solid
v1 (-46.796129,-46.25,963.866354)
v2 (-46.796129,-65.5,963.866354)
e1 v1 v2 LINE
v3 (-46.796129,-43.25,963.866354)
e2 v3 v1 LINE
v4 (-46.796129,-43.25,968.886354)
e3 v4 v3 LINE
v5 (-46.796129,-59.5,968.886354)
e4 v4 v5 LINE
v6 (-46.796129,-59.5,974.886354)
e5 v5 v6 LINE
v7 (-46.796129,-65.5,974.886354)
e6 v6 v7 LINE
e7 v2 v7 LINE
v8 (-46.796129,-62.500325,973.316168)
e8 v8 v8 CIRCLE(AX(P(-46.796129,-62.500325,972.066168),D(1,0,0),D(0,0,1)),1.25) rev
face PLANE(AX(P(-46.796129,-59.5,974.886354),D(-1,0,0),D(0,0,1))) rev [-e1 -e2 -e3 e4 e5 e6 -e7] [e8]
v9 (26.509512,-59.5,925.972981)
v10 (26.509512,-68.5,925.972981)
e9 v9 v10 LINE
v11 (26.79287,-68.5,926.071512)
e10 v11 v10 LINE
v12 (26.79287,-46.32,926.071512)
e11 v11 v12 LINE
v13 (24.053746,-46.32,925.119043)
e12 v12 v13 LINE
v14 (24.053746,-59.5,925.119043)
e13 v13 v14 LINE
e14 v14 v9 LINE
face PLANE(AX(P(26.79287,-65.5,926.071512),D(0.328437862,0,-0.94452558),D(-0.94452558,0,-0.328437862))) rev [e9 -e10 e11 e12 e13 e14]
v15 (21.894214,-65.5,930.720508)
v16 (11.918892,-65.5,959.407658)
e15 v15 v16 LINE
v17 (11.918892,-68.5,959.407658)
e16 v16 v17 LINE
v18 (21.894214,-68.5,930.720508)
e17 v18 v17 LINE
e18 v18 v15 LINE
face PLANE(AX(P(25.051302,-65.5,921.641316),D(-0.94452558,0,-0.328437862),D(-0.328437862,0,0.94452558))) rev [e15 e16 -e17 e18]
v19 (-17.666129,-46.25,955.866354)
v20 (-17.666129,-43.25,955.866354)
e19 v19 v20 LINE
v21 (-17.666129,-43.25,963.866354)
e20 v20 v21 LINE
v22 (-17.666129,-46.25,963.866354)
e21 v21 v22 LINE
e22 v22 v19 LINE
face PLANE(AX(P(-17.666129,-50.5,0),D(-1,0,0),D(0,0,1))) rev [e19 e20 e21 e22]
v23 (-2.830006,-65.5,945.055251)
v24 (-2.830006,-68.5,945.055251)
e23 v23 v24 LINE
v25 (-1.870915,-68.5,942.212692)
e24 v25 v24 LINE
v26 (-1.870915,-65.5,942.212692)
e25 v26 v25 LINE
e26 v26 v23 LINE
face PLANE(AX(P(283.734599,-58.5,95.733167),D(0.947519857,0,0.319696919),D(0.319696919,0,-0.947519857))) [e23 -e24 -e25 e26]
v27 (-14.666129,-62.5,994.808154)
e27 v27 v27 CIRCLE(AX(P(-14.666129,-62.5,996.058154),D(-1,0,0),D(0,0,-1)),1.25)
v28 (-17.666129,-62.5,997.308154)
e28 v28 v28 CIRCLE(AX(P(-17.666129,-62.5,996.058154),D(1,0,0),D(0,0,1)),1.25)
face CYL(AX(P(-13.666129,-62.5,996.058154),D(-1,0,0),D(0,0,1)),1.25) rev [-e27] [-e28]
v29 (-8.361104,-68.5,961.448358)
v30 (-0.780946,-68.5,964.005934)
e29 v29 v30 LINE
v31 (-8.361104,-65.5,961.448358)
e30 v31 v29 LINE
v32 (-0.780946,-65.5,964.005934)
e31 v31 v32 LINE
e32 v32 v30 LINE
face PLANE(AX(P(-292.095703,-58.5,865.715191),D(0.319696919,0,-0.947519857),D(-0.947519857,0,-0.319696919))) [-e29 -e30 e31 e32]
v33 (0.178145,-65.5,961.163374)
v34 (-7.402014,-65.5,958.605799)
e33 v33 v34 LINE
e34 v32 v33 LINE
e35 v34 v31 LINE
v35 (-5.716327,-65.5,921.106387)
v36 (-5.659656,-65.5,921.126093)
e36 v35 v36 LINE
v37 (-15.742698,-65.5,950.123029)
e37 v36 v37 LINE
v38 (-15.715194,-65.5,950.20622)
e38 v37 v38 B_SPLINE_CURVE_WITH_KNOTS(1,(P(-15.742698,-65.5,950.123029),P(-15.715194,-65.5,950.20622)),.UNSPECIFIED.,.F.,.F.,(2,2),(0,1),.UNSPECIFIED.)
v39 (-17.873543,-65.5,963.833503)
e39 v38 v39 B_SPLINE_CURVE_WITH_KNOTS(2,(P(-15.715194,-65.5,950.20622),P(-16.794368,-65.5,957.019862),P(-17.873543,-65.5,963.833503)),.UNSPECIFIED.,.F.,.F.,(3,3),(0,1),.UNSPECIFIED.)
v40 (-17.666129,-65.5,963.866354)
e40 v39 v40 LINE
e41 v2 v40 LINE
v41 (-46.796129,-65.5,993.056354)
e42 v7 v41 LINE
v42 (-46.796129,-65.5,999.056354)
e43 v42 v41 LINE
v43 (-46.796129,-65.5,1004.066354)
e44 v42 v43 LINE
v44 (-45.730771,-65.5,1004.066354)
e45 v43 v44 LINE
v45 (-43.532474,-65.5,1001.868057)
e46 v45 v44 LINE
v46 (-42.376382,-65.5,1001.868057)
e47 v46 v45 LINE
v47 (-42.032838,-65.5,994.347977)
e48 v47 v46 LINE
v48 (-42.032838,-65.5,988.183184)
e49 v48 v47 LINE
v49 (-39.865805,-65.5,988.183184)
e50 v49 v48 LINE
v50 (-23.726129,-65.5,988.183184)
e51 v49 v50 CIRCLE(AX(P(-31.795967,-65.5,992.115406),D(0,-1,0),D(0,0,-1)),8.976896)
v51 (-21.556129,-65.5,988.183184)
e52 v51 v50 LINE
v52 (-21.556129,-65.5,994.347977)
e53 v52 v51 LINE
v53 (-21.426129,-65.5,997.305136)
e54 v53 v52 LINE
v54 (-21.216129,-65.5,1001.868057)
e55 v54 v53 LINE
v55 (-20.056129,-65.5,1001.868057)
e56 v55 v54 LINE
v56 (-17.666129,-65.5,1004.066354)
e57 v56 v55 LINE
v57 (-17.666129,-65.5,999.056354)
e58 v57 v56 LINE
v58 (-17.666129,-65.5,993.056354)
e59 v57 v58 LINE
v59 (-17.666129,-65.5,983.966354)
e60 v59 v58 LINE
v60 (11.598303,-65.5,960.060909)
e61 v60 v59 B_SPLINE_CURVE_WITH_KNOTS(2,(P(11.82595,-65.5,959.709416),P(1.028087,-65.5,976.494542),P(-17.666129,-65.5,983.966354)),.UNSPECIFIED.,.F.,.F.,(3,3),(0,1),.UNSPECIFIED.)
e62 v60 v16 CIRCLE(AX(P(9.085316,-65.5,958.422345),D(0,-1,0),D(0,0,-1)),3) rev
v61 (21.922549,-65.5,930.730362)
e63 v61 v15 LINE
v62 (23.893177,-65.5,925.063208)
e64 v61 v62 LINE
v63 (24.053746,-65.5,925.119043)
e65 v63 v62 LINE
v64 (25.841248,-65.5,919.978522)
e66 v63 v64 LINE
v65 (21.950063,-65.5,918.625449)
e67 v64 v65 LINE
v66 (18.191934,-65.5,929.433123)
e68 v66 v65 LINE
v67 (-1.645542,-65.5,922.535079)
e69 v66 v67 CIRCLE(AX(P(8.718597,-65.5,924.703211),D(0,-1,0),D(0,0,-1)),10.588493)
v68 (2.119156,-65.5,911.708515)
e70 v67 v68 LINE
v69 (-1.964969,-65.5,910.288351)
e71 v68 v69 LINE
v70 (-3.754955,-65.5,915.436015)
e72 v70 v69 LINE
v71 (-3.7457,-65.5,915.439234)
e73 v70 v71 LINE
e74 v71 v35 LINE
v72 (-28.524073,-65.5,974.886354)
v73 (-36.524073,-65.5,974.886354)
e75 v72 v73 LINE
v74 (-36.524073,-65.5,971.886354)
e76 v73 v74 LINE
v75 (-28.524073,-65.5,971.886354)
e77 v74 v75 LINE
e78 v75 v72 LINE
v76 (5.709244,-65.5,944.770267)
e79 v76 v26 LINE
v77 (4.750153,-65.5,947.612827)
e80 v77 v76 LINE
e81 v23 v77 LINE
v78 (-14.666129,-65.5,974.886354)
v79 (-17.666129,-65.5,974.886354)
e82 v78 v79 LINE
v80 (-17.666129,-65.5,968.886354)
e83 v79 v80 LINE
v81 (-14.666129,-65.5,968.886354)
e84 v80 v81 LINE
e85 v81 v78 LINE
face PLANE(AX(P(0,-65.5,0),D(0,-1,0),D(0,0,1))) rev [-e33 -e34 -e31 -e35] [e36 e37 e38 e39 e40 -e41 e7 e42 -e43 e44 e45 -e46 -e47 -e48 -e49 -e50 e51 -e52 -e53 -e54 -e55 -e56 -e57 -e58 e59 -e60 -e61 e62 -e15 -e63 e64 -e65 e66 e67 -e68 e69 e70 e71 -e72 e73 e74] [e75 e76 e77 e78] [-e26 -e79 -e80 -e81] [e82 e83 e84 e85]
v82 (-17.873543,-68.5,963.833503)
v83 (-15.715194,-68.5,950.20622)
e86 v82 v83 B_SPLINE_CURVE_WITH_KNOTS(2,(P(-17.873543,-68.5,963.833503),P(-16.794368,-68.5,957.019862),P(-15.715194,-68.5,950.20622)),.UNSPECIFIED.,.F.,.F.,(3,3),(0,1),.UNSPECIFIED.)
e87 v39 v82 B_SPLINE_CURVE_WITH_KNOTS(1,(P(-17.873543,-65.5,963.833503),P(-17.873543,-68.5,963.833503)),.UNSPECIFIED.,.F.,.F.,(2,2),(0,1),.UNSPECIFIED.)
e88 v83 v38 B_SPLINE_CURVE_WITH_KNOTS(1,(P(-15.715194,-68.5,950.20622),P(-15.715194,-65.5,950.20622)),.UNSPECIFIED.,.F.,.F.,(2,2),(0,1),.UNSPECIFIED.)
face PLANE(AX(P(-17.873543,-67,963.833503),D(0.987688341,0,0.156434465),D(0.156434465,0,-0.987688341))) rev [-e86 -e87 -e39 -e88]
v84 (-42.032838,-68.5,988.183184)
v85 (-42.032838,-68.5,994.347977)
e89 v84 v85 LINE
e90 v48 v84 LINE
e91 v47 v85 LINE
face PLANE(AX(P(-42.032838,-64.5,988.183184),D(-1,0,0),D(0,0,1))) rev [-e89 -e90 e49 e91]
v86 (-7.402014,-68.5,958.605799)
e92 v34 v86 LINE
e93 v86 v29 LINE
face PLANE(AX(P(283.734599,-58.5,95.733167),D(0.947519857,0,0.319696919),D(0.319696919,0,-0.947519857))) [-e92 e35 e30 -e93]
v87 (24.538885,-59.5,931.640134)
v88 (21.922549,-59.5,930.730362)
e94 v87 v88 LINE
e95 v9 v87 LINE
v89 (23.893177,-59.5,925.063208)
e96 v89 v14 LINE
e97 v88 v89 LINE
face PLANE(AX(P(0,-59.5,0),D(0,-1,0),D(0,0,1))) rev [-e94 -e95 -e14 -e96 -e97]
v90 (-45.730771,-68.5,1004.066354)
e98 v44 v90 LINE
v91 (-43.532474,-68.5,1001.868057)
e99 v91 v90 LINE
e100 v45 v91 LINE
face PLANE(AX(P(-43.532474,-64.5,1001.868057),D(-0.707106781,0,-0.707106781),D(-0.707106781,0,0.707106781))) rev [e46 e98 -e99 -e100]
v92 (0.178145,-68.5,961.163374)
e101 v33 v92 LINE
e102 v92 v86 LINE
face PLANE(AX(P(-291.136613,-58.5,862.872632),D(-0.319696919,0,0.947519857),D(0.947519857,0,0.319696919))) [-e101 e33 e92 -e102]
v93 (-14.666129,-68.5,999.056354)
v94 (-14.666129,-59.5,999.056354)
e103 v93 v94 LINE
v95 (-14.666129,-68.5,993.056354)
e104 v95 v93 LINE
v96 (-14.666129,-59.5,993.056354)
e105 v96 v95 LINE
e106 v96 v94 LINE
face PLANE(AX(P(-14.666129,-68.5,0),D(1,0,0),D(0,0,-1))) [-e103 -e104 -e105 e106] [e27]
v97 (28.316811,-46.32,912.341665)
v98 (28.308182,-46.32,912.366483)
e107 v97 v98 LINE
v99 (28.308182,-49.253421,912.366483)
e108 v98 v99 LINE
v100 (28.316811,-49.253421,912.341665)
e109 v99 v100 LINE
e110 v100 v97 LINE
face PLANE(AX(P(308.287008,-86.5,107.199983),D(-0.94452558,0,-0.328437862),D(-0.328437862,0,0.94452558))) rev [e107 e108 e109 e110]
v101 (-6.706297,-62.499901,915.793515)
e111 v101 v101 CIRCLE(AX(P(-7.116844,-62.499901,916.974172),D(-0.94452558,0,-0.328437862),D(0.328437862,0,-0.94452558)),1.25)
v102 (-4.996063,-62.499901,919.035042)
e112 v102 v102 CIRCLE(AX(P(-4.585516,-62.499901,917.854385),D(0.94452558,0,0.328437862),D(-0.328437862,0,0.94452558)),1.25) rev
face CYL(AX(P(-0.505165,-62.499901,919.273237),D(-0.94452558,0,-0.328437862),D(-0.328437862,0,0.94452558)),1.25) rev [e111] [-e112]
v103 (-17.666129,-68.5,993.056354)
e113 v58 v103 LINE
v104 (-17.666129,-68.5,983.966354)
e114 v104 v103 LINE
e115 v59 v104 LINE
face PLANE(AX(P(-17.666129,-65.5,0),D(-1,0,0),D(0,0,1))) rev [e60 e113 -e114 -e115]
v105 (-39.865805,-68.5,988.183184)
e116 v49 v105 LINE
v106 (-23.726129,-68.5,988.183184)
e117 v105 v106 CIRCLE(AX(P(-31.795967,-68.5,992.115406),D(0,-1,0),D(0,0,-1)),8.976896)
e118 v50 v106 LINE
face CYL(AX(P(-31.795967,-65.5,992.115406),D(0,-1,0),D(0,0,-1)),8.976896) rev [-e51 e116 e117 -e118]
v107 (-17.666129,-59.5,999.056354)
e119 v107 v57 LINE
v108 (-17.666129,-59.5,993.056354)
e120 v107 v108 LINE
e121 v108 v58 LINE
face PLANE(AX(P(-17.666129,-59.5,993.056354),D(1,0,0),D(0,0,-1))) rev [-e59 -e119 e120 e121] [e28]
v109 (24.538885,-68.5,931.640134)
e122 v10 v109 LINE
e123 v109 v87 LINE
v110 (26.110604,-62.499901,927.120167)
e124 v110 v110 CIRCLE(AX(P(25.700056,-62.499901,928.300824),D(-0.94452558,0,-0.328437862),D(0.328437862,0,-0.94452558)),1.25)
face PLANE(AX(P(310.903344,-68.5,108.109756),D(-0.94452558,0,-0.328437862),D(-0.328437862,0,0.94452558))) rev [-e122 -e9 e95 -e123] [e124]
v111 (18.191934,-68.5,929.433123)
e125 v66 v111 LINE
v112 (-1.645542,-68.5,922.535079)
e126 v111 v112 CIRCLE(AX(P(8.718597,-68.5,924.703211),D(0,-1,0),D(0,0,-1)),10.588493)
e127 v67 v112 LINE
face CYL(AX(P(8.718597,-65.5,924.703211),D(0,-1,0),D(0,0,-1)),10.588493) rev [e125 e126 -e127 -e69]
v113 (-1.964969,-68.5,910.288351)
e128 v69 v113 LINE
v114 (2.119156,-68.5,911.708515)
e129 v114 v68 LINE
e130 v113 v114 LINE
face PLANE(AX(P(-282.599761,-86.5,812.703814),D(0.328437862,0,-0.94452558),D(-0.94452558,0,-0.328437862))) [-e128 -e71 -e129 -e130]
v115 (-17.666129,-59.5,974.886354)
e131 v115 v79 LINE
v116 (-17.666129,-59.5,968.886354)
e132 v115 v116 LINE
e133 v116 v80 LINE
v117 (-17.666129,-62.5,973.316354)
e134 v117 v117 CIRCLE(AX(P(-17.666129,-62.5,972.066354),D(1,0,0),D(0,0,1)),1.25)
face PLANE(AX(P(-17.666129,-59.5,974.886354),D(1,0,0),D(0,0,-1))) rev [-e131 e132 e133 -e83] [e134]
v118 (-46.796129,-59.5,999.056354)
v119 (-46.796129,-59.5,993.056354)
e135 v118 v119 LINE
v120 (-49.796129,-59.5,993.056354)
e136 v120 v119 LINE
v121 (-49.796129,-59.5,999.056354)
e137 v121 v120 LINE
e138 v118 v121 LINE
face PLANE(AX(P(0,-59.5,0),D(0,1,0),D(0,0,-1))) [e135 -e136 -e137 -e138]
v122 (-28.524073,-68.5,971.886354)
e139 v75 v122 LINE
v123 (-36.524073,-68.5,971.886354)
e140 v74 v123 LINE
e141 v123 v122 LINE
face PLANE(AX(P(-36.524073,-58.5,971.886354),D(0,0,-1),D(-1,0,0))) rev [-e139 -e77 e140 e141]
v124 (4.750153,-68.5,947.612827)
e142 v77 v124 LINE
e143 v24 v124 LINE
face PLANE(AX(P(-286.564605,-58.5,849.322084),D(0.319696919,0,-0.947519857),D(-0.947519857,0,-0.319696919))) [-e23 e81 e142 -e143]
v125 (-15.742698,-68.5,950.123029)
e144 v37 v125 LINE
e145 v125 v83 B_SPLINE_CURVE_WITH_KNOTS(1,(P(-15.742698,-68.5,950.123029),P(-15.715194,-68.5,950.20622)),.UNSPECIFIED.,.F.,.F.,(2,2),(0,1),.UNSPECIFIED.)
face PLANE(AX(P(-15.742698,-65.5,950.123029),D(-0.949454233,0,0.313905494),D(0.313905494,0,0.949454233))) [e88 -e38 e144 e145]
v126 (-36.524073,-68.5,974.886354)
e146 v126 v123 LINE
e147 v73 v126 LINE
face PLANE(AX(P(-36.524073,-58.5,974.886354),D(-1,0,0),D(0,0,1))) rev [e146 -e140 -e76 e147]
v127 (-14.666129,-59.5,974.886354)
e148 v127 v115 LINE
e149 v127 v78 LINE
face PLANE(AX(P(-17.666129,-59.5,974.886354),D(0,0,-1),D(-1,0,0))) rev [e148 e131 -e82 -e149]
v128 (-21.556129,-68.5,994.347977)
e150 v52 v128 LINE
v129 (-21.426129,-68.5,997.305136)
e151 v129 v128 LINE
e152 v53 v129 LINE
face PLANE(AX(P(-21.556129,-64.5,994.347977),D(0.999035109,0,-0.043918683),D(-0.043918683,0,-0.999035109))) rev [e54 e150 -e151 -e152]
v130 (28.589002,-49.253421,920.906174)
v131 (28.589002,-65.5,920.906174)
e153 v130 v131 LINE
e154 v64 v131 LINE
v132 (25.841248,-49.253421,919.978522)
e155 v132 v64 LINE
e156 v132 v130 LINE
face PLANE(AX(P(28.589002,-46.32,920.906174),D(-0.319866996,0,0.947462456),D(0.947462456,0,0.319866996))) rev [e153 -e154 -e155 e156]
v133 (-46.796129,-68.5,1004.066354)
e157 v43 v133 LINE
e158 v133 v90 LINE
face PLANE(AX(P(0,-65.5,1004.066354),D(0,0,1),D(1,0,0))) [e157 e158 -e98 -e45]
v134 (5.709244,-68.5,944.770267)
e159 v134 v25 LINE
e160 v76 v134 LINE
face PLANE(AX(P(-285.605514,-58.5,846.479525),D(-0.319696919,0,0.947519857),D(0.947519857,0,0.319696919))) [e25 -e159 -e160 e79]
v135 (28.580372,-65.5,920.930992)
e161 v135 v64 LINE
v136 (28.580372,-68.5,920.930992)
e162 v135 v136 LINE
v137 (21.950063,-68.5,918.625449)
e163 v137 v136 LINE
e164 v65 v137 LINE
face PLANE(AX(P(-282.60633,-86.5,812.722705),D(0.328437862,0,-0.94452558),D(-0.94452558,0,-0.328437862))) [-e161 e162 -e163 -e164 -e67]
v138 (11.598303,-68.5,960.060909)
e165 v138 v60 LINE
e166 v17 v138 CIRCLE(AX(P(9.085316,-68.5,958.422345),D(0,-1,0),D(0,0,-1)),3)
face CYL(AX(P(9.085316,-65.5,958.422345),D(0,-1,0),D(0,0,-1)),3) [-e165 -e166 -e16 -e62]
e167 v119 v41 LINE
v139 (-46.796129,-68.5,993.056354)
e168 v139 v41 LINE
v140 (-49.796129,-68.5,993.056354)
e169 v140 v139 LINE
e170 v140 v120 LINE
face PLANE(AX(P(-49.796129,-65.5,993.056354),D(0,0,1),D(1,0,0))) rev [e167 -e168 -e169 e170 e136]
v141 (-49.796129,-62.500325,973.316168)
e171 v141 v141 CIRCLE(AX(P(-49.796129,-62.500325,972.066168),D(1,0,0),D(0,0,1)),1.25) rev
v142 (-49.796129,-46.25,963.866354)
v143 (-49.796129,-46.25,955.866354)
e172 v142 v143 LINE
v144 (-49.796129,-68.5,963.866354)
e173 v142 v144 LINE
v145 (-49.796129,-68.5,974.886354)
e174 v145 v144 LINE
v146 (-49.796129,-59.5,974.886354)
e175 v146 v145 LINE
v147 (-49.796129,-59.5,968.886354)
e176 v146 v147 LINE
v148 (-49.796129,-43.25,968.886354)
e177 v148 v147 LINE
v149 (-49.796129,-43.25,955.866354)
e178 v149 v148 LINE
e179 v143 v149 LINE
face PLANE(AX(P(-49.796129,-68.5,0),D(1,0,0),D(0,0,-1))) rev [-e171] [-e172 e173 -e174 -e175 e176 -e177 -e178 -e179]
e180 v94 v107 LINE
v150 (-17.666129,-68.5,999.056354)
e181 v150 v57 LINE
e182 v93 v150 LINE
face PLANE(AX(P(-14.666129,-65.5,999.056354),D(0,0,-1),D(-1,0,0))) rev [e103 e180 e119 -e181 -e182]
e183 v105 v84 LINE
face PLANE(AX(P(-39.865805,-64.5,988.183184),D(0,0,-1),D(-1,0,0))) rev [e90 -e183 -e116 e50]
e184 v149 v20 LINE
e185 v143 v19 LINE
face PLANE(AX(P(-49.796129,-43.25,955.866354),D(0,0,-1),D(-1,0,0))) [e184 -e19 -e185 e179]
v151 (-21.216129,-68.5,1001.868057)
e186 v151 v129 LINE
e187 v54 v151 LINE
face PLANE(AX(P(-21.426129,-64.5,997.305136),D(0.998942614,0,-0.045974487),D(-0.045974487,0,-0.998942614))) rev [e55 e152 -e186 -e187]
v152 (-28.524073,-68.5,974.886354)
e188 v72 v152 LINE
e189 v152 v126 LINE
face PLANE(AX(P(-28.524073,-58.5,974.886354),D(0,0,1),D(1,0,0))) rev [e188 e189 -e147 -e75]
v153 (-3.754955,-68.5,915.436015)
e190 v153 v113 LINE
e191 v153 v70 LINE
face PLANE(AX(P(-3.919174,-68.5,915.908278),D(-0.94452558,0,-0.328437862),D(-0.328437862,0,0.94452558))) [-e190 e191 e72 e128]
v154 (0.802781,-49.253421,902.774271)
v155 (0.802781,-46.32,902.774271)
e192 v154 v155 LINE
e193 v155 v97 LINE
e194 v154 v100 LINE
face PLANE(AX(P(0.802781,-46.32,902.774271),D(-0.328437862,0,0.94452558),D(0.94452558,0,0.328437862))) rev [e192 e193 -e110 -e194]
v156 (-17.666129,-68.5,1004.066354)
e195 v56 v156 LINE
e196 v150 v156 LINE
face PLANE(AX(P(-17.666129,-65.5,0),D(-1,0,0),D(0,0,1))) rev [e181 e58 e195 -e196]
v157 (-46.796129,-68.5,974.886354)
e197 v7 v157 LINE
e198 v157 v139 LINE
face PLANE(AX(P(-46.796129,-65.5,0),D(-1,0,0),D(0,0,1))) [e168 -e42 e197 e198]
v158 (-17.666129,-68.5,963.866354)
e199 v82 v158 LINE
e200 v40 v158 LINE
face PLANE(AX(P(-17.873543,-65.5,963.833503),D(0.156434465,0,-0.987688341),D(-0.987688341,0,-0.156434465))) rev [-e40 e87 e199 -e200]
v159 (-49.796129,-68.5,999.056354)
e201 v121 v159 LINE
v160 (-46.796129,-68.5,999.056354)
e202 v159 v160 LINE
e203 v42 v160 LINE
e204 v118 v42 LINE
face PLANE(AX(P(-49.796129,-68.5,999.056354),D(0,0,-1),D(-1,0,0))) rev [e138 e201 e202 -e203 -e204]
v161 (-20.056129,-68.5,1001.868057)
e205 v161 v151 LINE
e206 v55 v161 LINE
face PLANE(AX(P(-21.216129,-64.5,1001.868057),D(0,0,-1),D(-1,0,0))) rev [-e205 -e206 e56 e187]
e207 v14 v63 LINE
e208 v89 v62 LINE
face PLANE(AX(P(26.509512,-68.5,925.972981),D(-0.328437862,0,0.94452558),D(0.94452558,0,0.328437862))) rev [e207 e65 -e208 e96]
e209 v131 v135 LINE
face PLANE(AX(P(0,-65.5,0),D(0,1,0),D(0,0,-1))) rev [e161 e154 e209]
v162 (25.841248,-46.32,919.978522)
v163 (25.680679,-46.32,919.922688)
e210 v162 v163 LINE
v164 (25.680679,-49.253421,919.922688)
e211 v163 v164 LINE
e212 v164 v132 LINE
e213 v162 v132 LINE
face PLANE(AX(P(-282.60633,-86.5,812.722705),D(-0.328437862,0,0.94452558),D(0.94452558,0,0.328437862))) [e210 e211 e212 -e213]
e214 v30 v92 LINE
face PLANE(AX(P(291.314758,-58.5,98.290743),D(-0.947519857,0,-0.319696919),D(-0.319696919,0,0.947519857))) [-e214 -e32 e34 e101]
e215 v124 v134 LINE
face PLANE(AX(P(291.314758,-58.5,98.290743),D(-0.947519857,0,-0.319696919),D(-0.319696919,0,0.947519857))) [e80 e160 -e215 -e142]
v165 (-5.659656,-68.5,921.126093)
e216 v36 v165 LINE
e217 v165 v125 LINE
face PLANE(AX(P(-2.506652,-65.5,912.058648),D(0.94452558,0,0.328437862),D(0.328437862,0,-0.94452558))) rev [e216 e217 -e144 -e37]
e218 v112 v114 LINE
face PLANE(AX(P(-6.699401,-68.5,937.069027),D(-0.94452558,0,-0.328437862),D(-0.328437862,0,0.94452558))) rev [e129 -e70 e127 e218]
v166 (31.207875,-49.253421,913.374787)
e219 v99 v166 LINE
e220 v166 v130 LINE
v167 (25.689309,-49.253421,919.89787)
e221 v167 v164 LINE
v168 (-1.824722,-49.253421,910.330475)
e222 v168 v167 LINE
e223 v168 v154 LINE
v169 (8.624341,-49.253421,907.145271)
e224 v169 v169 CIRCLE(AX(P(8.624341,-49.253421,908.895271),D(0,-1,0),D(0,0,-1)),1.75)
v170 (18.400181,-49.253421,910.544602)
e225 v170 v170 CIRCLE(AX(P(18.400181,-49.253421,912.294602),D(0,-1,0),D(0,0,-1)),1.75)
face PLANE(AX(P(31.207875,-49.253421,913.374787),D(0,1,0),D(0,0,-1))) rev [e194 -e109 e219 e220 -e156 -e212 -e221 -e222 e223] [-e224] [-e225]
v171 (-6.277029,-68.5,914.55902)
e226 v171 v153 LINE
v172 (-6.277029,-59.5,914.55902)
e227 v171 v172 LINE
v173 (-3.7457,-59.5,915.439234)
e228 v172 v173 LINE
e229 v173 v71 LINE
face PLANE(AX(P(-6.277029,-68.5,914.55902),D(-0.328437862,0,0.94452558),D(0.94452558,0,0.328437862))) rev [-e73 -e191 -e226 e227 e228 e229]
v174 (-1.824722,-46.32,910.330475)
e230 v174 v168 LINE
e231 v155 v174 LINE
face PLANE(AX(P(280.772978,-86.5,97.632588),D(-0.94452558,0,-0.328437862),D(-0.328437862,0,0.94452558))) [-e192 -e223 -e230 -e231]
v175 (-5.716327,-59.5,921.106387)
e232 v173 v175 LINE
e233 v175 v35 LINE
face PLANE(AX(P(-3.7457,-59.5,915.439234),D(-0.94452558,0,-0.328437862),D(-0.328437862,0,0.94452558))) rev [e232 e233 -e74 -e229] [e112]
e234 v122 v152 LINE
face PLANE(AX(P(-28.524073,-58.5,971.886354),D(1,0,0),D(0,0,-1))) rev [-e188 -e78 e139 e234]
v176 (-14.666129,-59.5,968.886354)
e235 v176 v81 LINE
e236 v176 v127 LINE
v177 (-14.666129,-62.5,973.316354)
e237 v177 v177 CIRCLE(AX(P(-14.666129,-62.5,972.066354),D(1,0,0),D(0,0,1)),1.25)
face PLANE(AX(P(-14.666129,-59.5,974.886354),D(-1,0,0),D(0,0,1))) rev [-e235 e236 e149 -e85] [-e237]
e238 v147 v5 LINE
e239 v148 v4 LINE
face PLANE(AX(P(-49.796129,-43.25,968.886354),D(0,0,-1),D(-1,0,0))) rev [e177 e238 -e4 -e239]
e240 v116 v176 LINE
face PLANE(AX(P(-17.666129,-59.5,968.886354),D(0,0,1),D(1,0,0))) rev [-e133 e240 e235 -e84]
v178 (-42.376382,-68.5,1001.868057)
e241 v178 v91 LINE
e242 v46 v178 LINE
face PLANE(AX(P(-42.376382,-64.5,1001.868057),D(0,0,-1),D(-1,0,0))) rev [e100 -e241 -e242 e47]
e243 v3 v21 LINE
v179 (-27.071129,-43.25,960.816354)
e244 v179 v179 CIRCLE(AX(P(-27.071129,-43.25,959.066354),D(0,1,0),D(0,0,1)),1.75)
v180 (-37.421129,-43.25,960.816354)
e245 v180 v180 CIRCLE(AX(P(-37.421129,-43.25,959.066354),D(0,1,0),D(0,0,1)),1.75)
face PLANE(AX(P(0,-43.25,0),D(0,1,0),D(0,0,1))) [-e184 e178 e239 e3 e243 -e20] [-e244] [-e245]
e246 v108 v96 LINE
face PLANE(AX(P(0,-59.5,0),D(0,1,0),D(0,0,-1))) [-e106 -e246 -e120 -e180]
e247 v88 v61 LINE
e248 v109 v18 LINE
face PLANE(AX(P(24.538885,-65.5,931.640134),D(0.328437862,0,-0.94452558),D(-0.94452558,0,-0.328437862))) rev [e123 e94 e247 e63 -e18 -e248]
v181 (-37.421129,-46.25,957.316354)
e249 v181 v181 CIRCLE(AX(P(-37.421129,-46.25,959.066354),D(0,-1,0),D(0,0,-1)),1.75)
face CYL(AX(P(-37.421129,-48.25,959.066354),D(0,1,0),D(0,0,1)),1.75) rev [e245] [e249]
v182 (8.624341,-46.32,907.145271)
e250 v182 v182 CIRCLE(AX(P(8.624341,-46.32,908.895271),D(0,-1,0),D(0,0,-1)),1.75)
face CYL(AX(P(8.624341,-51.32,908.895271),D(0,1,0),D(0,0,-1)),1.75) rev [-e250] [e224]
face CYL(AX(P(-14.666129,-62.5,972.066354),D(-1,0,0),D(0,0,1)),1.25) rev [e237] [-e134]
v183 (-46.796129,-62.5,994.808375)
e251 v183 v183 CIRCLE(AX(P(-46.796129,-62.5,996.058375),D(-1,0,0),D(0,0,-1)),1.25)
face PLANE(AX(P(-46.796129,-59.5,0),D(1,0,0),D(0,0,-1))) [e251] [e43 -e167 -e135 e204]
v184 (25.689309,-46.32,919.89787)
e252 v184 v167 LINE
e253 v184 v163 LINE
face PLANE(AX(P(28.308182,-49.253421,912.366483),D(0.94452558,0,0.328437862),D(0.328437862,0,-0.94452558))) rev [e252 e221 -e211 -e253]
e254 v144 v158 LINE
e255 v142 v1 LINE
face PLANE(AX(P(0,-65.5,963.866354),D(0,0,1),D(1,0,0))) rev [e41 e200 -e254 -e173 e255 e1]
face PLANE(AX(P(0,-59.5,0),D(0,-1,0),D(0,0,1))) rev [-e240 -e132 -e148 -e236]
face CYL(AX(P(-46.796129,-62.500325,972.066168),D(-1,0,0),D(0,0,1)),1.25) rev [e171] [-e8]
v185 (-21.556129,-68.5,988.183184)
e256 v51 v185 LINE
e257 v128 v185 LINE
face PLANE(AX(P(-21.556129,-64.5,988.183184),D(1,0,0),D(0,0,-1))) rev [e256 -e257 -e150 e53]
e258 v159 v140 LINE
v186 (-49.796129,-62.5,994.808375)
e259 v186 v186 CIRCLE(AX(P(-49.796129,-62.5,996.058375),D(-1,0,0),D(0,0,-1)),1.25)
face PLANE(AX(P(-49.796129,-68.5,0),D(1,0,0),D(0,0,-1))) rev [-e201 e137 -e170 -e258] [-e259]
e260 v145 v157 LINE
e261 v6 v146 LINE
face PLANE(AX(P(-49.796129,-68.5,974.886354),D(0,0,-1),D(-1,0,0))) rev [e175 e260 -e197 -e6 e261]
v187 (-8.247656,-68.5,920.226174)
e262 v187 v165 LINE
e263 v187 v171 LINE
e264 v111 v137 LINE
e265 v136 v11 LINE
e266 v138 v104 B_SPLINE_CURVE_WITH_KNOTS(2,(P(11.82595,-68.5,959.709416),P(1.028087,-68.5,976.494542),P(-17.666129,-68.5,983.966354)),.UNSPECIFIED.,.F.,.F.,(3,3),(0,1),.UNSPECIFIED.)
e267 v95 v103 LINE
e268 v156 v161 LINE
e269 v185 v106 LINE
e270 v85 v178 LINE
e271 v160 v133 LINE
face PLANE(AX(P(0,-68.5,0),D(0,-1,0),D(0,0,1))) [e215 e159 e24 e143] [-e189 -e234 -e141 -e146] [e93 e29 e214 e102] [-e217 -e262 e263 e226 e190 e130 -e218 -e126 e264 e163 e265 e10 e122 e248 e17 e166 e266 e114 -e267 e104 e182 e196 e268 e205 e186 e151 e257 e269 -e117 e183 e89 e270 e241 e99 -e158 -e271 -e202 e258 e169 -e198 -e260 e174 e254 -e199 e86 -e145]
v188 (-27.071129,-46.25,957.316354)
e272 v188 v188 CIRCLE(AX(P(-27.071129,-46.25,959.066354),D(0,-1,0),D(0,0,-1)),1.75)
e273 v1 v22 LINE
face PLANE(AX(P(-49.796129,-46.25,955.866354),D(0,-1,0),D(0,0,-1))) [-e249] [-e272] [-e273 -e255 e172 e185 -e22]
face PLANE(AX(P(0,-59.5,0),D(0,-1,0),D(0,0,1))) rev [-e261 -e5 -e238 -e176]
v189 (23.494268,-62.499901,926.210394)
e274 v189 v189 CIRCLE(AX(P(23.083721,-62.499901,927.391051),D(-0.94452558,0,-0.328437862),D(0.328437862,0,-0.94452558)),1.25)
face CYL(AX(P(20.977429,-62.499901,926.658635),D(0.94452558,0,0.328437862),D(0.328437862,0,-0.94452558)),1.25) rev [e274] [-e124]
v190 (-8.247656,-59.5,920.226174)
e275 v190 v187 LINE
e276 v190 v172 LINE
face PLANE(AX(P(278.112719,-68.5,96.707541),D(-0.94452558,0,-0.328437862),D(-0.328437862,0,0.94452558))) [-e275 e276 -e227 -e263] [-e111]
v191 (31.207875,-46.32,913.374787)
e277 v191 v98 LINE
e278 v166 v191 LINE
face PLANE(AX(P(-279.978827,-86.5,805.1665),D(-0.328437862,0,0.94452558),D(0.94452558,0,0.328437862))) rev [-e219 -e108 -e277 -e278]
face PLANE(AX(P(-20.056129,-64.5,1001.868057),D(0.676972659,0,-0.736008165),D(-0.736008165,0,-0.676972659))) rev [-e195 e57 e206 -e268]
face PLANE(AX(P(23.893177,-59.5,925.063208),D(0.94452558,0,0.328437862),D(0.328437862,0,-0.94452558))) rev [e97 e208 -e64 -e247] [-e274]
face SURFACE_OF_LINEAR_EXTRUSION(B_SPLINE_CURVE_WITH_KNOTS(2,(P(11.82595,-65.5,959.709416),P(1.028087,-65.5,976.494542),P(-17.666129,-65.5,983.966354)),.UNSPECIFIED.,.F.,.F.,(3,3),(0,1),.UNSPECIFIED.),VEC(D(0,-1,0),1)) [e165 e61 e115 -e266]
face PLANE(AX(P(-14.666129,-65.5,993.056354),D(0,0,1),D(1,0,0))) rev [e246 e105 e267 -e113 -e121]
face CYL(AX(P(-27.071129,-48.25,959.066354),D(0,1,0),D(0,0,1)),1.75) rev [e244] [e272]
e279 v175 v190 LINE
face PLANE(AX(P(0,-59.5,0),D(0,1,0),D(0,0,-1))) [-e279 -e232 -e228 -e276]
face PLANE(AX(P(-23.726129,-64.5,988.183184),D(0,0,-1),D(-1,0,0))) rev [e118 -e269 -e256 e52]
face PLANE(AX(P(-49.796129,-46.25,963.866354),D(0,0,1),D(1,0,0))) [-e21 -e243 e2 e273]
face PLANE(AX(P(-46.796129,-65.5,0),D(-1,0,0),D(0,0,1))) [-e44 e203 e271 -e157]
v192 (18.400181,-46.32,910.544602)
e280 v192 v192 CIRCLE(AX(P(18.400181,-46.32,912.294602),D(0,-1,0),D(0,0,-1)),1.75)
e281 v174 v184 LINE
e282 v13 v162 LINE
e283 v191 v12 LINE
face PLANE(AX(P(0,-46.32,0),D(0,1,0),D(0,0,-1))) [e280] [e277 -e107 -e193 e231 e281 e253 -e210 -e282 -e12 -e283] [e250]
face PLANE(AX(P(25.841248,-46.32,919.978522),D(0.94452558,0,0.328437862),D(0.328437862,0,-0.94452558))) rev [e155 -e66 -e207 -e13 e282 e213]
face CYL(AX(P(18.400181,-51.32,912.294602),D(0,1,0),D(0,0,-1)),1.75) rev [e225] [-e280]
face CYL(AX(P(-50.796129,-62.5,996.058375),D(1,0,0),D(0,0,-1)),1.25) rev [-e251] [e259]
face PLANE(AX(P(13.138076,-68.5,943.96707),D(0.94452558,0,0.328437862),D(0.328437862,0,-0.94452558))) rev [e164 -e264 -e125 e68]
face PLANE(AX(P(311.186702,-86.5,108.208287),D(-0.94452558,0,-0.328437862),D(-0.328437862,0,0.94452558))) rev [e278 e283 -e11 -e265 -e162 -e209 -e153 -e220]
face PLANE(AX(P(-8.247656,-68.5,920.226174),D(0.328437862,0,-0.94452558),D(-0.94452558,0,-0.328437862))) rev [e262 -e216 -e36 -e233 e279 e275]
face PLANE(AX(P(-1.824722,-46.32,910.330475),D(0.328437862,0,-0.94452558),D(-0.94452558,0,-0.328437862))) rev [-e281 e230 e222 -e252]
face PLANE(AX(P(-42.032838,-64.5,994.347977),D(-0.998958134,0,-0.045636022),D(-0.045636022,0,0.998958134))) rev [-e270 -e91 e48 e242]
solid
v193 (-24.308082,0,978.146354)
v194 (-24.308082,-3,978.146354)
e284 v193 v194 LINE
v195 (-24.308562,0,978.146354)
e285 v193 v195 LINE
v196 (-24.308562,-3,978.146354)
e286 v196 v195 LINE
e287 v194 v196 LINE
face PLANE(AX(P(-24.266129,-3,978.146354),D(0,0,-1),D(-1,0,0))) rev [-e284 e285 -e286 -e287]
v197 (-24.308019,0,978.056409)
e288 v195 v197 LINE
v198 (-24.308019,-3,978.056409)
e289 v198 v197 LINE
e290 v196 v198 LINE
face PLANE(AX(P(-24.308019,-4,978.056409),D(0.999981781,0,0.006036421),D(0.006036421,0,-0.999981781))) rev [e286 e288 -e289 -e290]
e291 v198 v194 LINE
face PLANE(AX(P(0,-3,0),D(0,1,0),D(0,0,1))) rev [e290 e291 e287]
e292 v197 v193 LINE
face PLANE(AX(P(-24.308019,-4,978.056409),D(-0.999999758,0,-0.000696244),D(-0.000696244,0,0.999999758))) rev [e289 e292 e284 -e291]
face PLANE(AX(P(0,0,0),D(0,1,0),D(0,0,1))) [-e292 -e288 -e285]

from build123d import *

# Parameters (mm, degrees)
SKETCH1_W                 = 29.13
SKETCH1_H                 = 40.2
BOSS_EXTRUDE1_DEPTH       = 3
SKETCH3_W                 = 6
SKETCH3_H                 = 3
BOSS_EXTRUDE2_DEPTH       = 3
SKETCH4_W                 = 3
SKETCH4_H                 = 6
BOSS_EXTRUDE3_DEPTH       = 6
SKETCH6_W                 = 6
SKETCH6_H                 = 3
BOSS_EXTRUDE4_DEPTH       = 2
SKETCH7_W                 = 3.000000005
SKETCH7_H                 = 6
BOSS_EXTRUDE6_DEPTH       = 6
SKETCH9_R                 = 1.25
CUT_EXTRUDE1_DEPTH        = 3
SKETCH8_R                 = 1.250000001
CUT_EXTRUDE2_DEPTH        = 3
SKETCH11_W                = 6
SKETCH11_H                = 3
BOSS_EXTRUDE7_DEPTH       = 3
SKETCH19_W                = 3
SKETCH19_H                = 6
BOSS_EXTRUDE11_DEPTH      = 6
SKETCH21_W                = 6
SKETCH21_H                = 3
BOSS_EXTRUDE12_DEPTH      = 3
SKETCH22_W                = 3
SKETCH22_H                = 6
BOSS_EXTRUDE13_DEPTH      = 6
SKETCH24_R                = 1.25
CUT_EXTRUDE5_DEPTH        = 4
SKETCH23_R                = 1.25
CUT_EXTRUDE6_DEPTH        = 4
CUT_EXTRUDE8_DEPTH        = 4
CUT_EXTRUDE11_DEPTH       = 4
SKETCH30_W                = 25.92
SKETCH30_H                = 3
CUT_EXTRUDE12_DEPTH       = 15
SKETCH33_W                = 29.17650364
SKETCH33_H                = 3
BOSS_EXTRUDE14_DEPTH      = 40.3
SKETCH34_W                = 21.00258235
SKETCH34_H                = 3
CUT_EXTRUDE15_DEPTH       = 25
CUT_EXTRUDE16_DEPTH       = 5
SKETCH37_W                = 4.5
SKETCH37_H                = 3
SKETCH37_W_2              = 1.5
BOSS_EXTRUDE15_DEPTH      = 3
BOSS_EXTRUDE16_DEPTH      = 6
SKETCH41_W                = 6
SKETCH41_H                = 3
BOSS_EXTRUDE17_DEPTH      = 2.8
BOSS_EXTRUDE18_DEPTH      = 6
SKETCH44_R                = 1.25
CUT_EXTRUDE19_DEPTH       = 7
SKETCH45_R                = 1.249999996
CUT_EXTRUDE20_DEPTH       = 5
SKETCH46_W                = 5.02
SKETCH46_H                = 3
BOSS_EXTRUDE19_DEPTH      = 3
SKETCH48_W                = 3
SKETCH48_H                = 5.02
BOSS_EXTRUDE20_DEPTH      = 22.25
BOSS_EXTRUDE22_DEPTH      = 29.13
BOSS_EXTRUDE22_DEPTH_BACK = 3
SKETCH50_W                = 8
SKETCH50_H                = 3
SKETCH51_R                = 1.75
CUT_EXTRUDE21_DEPTH       = 5
SKETCH56_W                = 3.994197227
SKETCH56_H                = 3.994197227
CUT_EXTRUDE26_DEPTH       = 0.1
FILLET4_START             = -19
FILLET4_DEPTH             = 5
BOSS_EXTRUDE28_DEPTH      = 0.21
BOSS_EXTRUDE29_DEPTH      = 3
BOSS_EXTRUDE30_DEPTH      = 1.95
BOSS_EXTRUDE30_DEPTH_BACK = 4
SKETCH68_W                = 4.32399603
SKETCH68_H                = 3
SKETCH69_W                = 3.919724064
SKETCH69_H                = 3
BOSS_EXTRUDE31_DEPTH      = 1.83
SKETCH70_W                = 5.44243662
SKETCH70_H                = 3
BOSS_EXTRUDE32_DEPTH      = 3.1
BOSS_EXTRUDE33_DEPTH      = 19.18
SKETCH72_W                = 3.07
SKETCH72_H                = 2.93342148
BOSS_EXTRUDE34_DEPTH      = 8
SKETCH73_W                = 8
SKETCH73_H                = 2.93342148
BOSS_EXTRUDE35_DEPTH      = 29.13
SKETCH74_R                = 1.75
CUT_EXTRUDE27_DEPTH       = 5
BOSS_EXTRUDE36_DEPTH      = 3
BOSS_EXTRUDE37_DEPTH      = 3
SKETCH77_W                = 8
SKETCH77_H                = 3
CUT_EXTRUDE28_DEPTH       = 10
CUT_EXTRUDE29_DEPTH       = 10


with BuildPart() as part:
    # Sketch1 → Boss-Extrude1 (new body)
    with BuildSketch(Plane(origin=(0, 0, 0), x_dir=(1, 0, 0), z_dir=(0, 1, 0))):
        with Locations((-32.231128585, -983.966354464)):
            Rectangle(SKETCH1_W, SKETCH1_H)
        with BuildLine():
            Line((-15.507778999, -950.239071497), (-17.666128585, -963.866354464))
            Line((-17.666128585, -963.866354464), (-17.666128585, -983.966354464))
            add(Edge.make_bspline(
                [(11.825950039, -959.709415703), (1.028086592, -976.494542347), (-17.666128585, -983.966354464)],
                knots=[0, 0, 0, 1, 1, 1], degree=2))
            Line((11.825950039, -959.709415703), (-15.497121464, -950.208422428))
            Line((-15.497121464, -950.208422428), (-15.507778999, -950.239071497))
        make_face()
    extrude(amount=-BOSS_EXTRUDE1_DEPTH)

    # Sketch3 → Boss-Extrude2 (add)
    with BuildSketch(Plane.ZY.offset(46.796128585)):
        with Locations((971.886354464, -1.5)):
            Rectangle(SKETCH3_W, SKETCH3_H)
    extrude(amount=BOSS_EXTRUDE2_DEPTH)

    # Sketch4 → Boss-Extrude3 (add)
    with BuildSketch(Plane.XZ.offset(3)):
        with Locations((-48.296128585, 971.886354464)):
            Rectangle(SKETCH4_W, SKETCH4_H)
    extrude(amount=BOSS_EXTRUDE3_DEPTH)

    # Sketch6 → Boss-Extrude4 (add)
    with BuildSketch(Plane(origin=(-17.666128585, 0, 0), x_dir=(0, 0, -1), z_dir=(1, 0, 0))):
        with Locations((-971.886354464, -1.5)):
            Rectangle(SKETCH6_W, SKETCH6_H)
    extrude(amount=BOSS_EXTRUDE4_DEPTH)

    # Sketch7 → Boss-Extrude6 (add)
    with BuildSketch(Plane.XZ.offset(3)):
        with Locations((-16.166128583, 971.886354464)):
            Rectangle(SKETCH7_W, SKETCH7_H)
    extrude(amount=BOSS_EXTRUDE6_DEPTH)

    # Sketch9 → Cut-Extrude1 (cut)
    with BuildSketch(Plane.ZY.offset(17.666128585)):
        with Locations((972.066354464, -6)):
            Circle(SKETCH9_R)
    extrude(amount=-CUT_EXTRUDE1_DEPTH, mode=Mode.SUBTRACT)

    # Sketch8 → Cut-Extrude2 (cut)
    with BuildSketch(Plane(origin=(-49.796128585, 0, 0), x_dir=(0, 0, -1), z_dir=(1, 0, 0))):
        with Locations(Location((-972.066168305, -5.999675203, 0), (0, 0, 180))):
            Circle(SKETCH8_R)
    extrude(amount=CUT_EXTRUDE2_DEPTH, mode=Mode.SUBTRACT)

    # Sketch11 → Boss-Extrude7 (add)
    with BuildSketch(Plane.ZY.offset(46.796128585)):
        with Locations((996.056354464, -1.5)):
            Rectangle(SKETCH11_W, SKETCH11_H)
    extrude(amount=BOSS_EXTRUDE7_DEPTH)

    # Sketch19 → Boss-Extrude11 (add)
    with BuildSketch(Plane.XZ.offset(3)):
        with Locations((-48.296128585, 996.056354464)):
            Rectangle(SKETCH19_W, SKETCH19_H)
    extrude(amount=BOSS_EXTRUDE11_DEPTH)

    # Sketch21 → Boss-Extrude12 (add)
    with BuildSketch(Plane(origin=(-17.666128585, 0, 0), x_dir=(0, 0, -1), z_dir=(1, 0, 0))):
        with Locations((-996.056354464, -1.5)):
            Rectangle(SKETCH21_W, SKETCH21_H)
    extrude(amount=BOSS_EXTRUDE12_DEPTH)

    # Sketch22 → Boss-Extrude13 (add)
    with BuildSketch(Plane.XZ.offset(3)):
        with Locations((-16.166128585, 996.056354464)):
            Rectangle(SKETCH22_W, SKETCH22_H)
    extrude(amount=BOSS_EXTRUDE13_DEPTH)

    # Sketch24 → Cut-Extrude5 (cut)
    with BuildSketch(Plane(origin=(-46.796128585, 0, 0), x_dir=(0, 0, -1), z_dir=(1, 0, 0))):
        with Locations((-996.058375158, -6)):
            Circle(SKETCH24_R)
    extrude(amount=-CUT_EXTRUDE5_DEPTH, mode=Mode.SUBTRACT)

    # Sketch23 → Cut-Extrude6 (cut)
    with BuildSketch(Plane.ZY.offset(17.666128585)):
        with Locations((996.058154464, -6)):
            Circle(SKETCH23_R)
    extrude(amount=-CUT_EXTRUDE6_DEPTH, mode=Mode.SUBTRACT)

    # Sketch28 → Cut-Extrude8 (cut)
    with BuildSketch(Plane(origin=(0, 0, 0), x_dir=(1, 0, 0), z_dir=(0, 1, 0))):
        Polygon((-39.266128585, -975.05646378), (-24.308019321, -978.056409122), (-24.326128585, -981.056354464), (-39.266128585, -978.146354464), align=None)
    extrude(amount=-CUT_EXTRUDE8_DEPTH, mode=Mode.SUBTRACT)

    # Sketch29 → Cut-Extrude11 (cut)
    with BuildSketch(Plane(origin=(0, 0, 0), x_dir=(1, 0, 0), z_dir=(0, 1, 0))):
        Polygon((-39.266128585, -975.05646378), (-39.865804676, -988.183184315), (-42.032837695, -988.183184315), (-42.032837695, -994.347976596), (-42.376382193, -1001.868057312), (-43.532474114, -1001.868057312), (-45.730771266, -1004.066354464), (-39.266128585, -1004.066354464), (-39.266128585, -988.183184315), align=None)
        Polygon((-24.308019321, -978.056409122), (-24.326128585, -1004.066354464), (-17.666128585, -1004.066354464), (-20.056128585, -1001.868057312), (-21.216128585, -1001.868057312), (-21.426128585, -997.305136389), (-21.556128585, -994.347976596), (-21.556128585, -988.183184315), (-23.726128585, -988.183184315), align=None)
    extrude(amount=-CUT_EXTRUDE11_DEPTH, mode=Mode.SUBTRACT)


with BuildPart() as cut_extrude11_piece_1:
    # of the separate pieces the step leaves, piece 1, a body of its own (cut_extrude11_pieces)
    add(part.part.solids().sort_by_distance((-17.666128585, 0, 983.966354464))[0])


with BuildPart() as cut_extrude11_piece_2:
    # of the separate pieces the step leaves, piece 2, a body of its own (cut_extrude11_pieces)
    add(part.part.solids().sort_by_distance((-24.326128585, 0, 1004.066354464))[0])


with BuildPart() as cut_extrude12_tool:
    # Sketch30 → Cut-Extrude12 (new body)
    with BuildSketch(Plane.ZY.offset(39.266128585)):
        with Locations((991.106354464, -1.5)):
            Rectangle(SKETCH30_W, SKETCH30_H)
    extrude(amount=-CUT_EXTRUDE12_DEPTH)


with BuildPart() as cut_extrude11_piece_1_1:
    add(cut_extrude11_piece_1.part)

    # Cut-Extrude12: cut by cut_extrude12_tool
    add(cut_extrude12_tool.part, mode=Mode.SUBTRACT)

    # Sketch33 → Boss-Extrude14 (add)
    with BuildSketch(Plane(origin=(-296.443416752, 0, 852.515567448), x_dir=(-0.9445255798324886, 0, -0.32843786176703366), z_dir=(0.3284378617670337, 0, -0.9445255798324887))):
        with Locations((-311.77524668, -1.5)):
            Rectangle(SKETCH33_W, SKETCH33_H)
    extrude(amount=BOSS_EXTRUDE14_DEPTH)

    # Sketch34 → Cut-Extrude15 (cut)
    with BuildSketch(Plane(origin=(-283.207370923, 0, 814.451186581), x_dir=(-0.9445255798324887, 0, -0.32843786176703327), z_dir=(0.32843786176703327, 0, -0.9445255798324887))):
        with Locations((-311.942483261, -1.5)):
            Rectangle(SKETCH34_W, SKETCH34_H)
    extrude(amount=-CUT_EXTRUDE15_DEPTH, mode=Mode.SUBTRACT)

    # Sketch35 → Cut-Extrude16 (cut)
    with BuildSketch(Plane(origin=(0, 0, 0), x_dir=(1, 0, 0), z_dir=(0, 1, 0))):
        Polygon((-6.699400727, -937.069026653), (11.67040627, -948.187810964), (13.138075545, -943.967069892), align=None)
    extrude(amount=-CUT_EXTRUDE16_DEPTH, mode=Mode.SUBTRACT)

    # Sketch37 → Boss-Extrude15 (add)
    with BuildSketch(Plane(origin=(280.946295288, 0, 97.69285498), x_dir=(-0.32843786176743117, 0, 0.9445255798323505), z_dir=(-0.9445255798323505, 0, -0.32843786176743117))):
        with Locations((868.136002588, -1.5)):
            Rectangle(SKETCH37_W, SKETCH37_H)
        with Locations((871.136002588, -1.5)):
            Rectangle(SKETCH37_W_2, SKETCH37_H)
    extrude(amount=BOSS_EXTRUDE15_DEPTH)

    # Sketch39 → Boss-Extrude16 (add)
    with BuildSketch(Plane.XZ.offset(3)):
        Polygon((-6.277028676, 914.559020058), (-3.745700122, 915.439233528), (-5.716327292, 921.106387007), (-8.247655846, 920.226173537), align=None)
    extrude(amount=BOSS_EXTRUDE16_DEPTH)

    # Sketch41 → Boss-Extrude17 (add)
    with BuildSketch(Plane(origin=(308.258672657, 0, 107.190129606), x_dir=(0.3284378617670337, 0, -0.9445255798324887), z_dir=(0.9445255798324887, 0, 0.3284378617670337))):
        with Locations((-868.898439213, -1.5)):
            Rectangle(SKETCH41_W, SKETCH41_H)
    extrude(amount=BOSS_EXTRUDE17_DEPTH)

    # Sketch42 → Boss-Extrude18 (add)
    with BuildSketch(Plane.XZ.offset(3)):
        Polygon((23.893176542, 925.063208116), (21.922549371, 930.730361595), (24.538885227, 931.640134472), (26.509512398, 925.972980993), align=None)
    extrude(amount=BOSS_EXTRUDE18_DEPTH)

    # Sketch44 → Cut-Extrude19 (cut)
    with BuildSketch(Plane(origin=(278.112718549, 0, 96.707541395), x_dir=(0.32843786176743106, 0, -0.9445255798323505), z_dir=(0.9445255798323505, 0, 0.32843786176743106))):
        with Locations(Location((-868.443002584, -6.00009913, 0), (0, 0, 180))):
            Circle(SKETCH44_R)
    extrude(amount=CUT_EXTRUDE19_DEPTH, mode=Mode.SUBTRACT)

    # Sketch45 → Cut-Extrude20 (cut)
    with BuildSketch(Plane(origin=(310.90334428, 0, 108.109755619), x_dir=(0.32843786176704176, 0, -0.9445255798324859), z_dir=(0.944525579832486, 0, 0.32843786176704176))):
        with Locations((-868.363002583, -6.00009913)):
            Circle(SKETCH45_R)
    extrude(amount=-CUT_EXTRUDE20_DEPTH, mode=Mode.SUBTRACT)


with BuildPart() as cut_extrude11_piece_2_1:
    add(cut_extrude11_piece_2.part)

    # Cut-Extrude12: cut by cut_extrude12_tool
    add(cut_extrude12_tool.part, mode=Mode.SUBTRACT)


with BuildPart() as body_3:
    # Mirror1: mirrored copy
    add(cut_extrude11_piece_1_1.part.mirror(Plane(origin=(0, -9, 0), x_dir=(0, 0, 1), z_dir=(0, -1, 0))))

    # Sketch46 → Boss-Extrude19 (add)
    with BuildSketch(Plane.ZY.offset(46.796128585)):
        with Locations((966.376354464, -16.5)):
            Rectangle(SKETCH46_W, SKETCH46_H)
    extrude(amount=BOSS_EXTRUDE19_DEPTH)

    # Sketch48 → Boss-Extrude20 (add)
    with BuildSketch(Plane(origin=(0, -15, 0), x_dir=(1, 0, 0), z_dir=(0, 1, 0))):
        with Locations((-48.296128585, -966.376354464)):
            Rectangle(SKETCH48_W, SKETCH48_H)
    extrude(amount=BOSS_EXTRUDE20_DEPTH)

    # Sketch50 → Boss-Extrude22 (add, two sides: drawn at the far end of the back side and taken through both)
    with BuildSketch(Plane(origin=(-46.796128585, 0, 0), x_dir=(0, 0, -1), z_dir=(1, 0, 0)).offset(-BOSS_EXTRUDE22_DEPTH_BACK)):
        with Locations((-959.866354464, 5.75)):
            Rectangle(SKETCH50_W, SKETCH50_H)
    extrude(amount=BOSS_EXTRUDE22_DEPTH + BOSS_EXTRUDE22_DEPTH_BACK)

    # Sketch51 → Cut-Extrude21 (cut)
    with BuildSketch(Plane(origin=(0, 7.25, 0), x_dir=(1, 0, 0), z_dir=(0, 1, 0))):
        with Locations(Location((-37.42112854, -959.066354487, 0), (0, 0, 270))):
            Circle(SKETCH51_R)
        with Locations(Location((-27.07112854, -959.066354497, 0), (0, 0, 270))):
            Circle(SKETCH51_R)
    extrude(amount=-CUT_EXTRUDE21_DEPTH, mode=Mode.SUBTRACT)

    # Sketch56 → Cut-Extrude26 (cut)
    with BuildSketch(Plane(origin=(-283.207370923, 0, 814.451186581), x_dir=(-0.9445255798324892, 0, -0.32843786176703227), z_dir=(0.32843786176703227, 0, -0.9445255798324892))):
        with Locations((-299.444093473, -16.997098614)):
            Rectangle(SKETCH56_W, SKETCH56_H)
    extrude(amount=-CUT_EXTRUDE26_DEPTH, mode=Mode.SUBTRACT)

    # Fillet4: read off the stored shape, not the designer's step
    # Fillet4 outline → Fillet4 (cut)
    with BuildSketch(Plane(origin=(0, 0, 0), x_dir=(1, 0, 0), z_dir=(0, 1, 0)).offset(FILLET4_START)):
        with BuildLine():
            Line((11.815255904, -959.705697054), (11.918892326, -959.407658179))
            ThreePointArc((11.918892326, -959.407658179), (11.77847749, -959.744040081), (11.598302874, -960.060909482))
            add(Edge.make_bspline(
                [(11.825950039, -959.709415703), (11.712561825, -959.885676085), (11.598302874, -960.060909482)],
                knots=[0, 0, 0, 0.010500986, 0.010500986, 0.010500986], degree=2))
            Line((11.825950039, -959.709415703), (11.815255904, -959.705697054))
        make_face()
    extrude(amount=FILLET4_DEPTH, mode=Mode.SUBTRACT)


with BuildPart() as body_3_2:
    # Mirror2: mirrored copy
    add(body_3.part.mirror(Plane(origin=(-13.559951136, -18, 962.196424994), x_dir=(0, 0, 1), z_dir=(0, -1, 0))))

    # Sketch63 → Boss-Extrude28 (add)
    with BuildSketch(Plane(origin=(131.691734271, 0, 20.857921628), x_dir=(-0.15643446504022615, 0, 0.9876883405951385), z_dir=(-0.9876883405951385, 0, -0.15643446504022615))):
        with BuildLine():
            add(Edge.make_bspline(
                [(954.763151571, -21), (947.864577189, -21), (940.966002807, -21)],
                knots=[0, 0, 0, 1, 1, 1], degree=2))
            Line((940.966002807, -21), (940.966002807, -18))
            add(Edge.make_bspline(
                [(954.763151571, -18), (947.864577189, -18), (940.966002807, -18)],
                knots=[0, 0, 0, 1, 1, 1], degree=2))
            Line((954.763151571, -18), (954.763151571, -21))
        make_face()
    extrude(amount=BOSS_EXTRUDE28_DEPTH)

    # Sketch67 → Boss-Extrude29 (add)
    with BuildSketch(Plane(origin=(0, -18, 0), x_dir=(1, 0, 0), z_dir=(0, 1, 0))):
        Polygon((-15.715193551, -950.206220259), (-15.742698114, -950.123028585), (-15.497121464, -950.208422428), (-15.507778999, -950.239071497), align=None)
    extrude(amount=-BOSS_EXTRUDE29_DEPTH)

    # Sketch68 → Boss-Extrude30 (add, two sides: drawn at the far end of the back side and taken through both)
    with BuildSketch(Plane(origin=(-283.240214709, 0, 814.545639139), x_dir=(-0.9445255798324883, -3.1744861168227707e-15, -0.32843786176703493), z_dir=(0.32843786176703493, -9.129225613729643e-15, -0.9445255798324883)).offset(-BOSS_EXTRUDE30_DEPTH_BACK)):
        with Locations((-299.279194071, -19.5)):
            Rectangle(SKETCH68_W, SKETCH68_H)
    extrude(amount=BOSS_EXTRUDE30_DEPTH + BOSS_EXTRUDE30_DEPTH_BACK)

    # Sketch69 → Boss-Extrude31 (add)
    with BuildSketch(Plane(origin=(-283.207370923, 0, 814.451186581), x_dir=(-0.9445255798324895, 0, -0.32843786176703144), z_dir=(0.32843786176703144, 0, -0.9445255798324895))):
        with Locations((-324.403636468, -19.5)):
            Rectangle(SKETCH69_W, SKETCH69_H)
    extrude(amount=BOSS_EXTRUDE31_DEPTH)

    # Sketch70 → Boss-Extrude32 (add)
    with BuildSketch(Plane(origin=(308.258672657, 0, 107.190129606), x_dir=(0.3284378617670337, 0, -0.9445255798324887), z_dir=(0.9445255798324887, 0, 0.3284378617670337))):
        with Locations((-863.177220903, -19.5)):
            Rectangle(SKETCH70_W, SKETCH70_H)
    extrude(amount=BOSS_EXTRUDE32_DEPTH)

    # Sketch71 → Boss-Extrude33 (add)
    with BuildSketch(Plane.XZ.offset(21)):
        Polygon((28.589002033, 920.906174309), (26.792870072, 926.071512351), (24.05374589, 925.119042552), (25.841248137, 919.978521948), align=None)
    extrude(amount=BOSS_EXTRUDE33_DEPTH)

    # Sketch72 → Boss-Extrude34 (add)
    with BuildSketch(Plane(origin=(-282.606329636, 0, 812.722704769), x_dir=(-0.9445255798324861, 0, -0.3284378617670412), z_dir=(0.3284378617670412, 0, -0.9445255798324861))):
        with Locations((-327.9284985, -38.71328926)):
            Rectangle(SKETCH72_W, SKETCH72_H)
    extrude(amount=BOSS_EXTRUDE34_DEPTH)

    # Sketch73 → Boss-Extrude35 (add)
    with BuildSketch(Plane(origin=(308.287008424, 0, 107.199982742), x_dir=(-0.3284378617669627, 0, 0.9445255798325134), z_dir=(-0.9445255798325134, 0, -0.3284378617669627))):
        with Locations((856.429727564, -38.71328926)):
            Rectangle(SKETCH73_W, SKETCH73_H)
    extrude(amount=BOSS_EXTRUDE35_DEPTH)

    # Sketch74 → Cut-Extrude27 (cut)
    with BuildSketch(Plane.XZ.offset(40.18)):
        with Locations(Location((18.400180873, 912.294602496, 0), (0, 0, 270))):
            Circle(SKETCH74_R)
        with Locations(Location((8.624341118, 908.895270636, 0), (0, 0, 270))):
            Circle(SKETCH74_R)
    extrude(amount=-CUT_EXTRUDE27_DEPTH, mode=Mode.SUBTRACT)


with BuildPart() as body_3_3:
    # Mirror3: mirrored copy
    add(body_3_2.part.mirror(Plane(origin=(-34.71161526, -43.25, 960.314964031), x_dir=(0, 0, 1), z_dir=(0, -1, 0))))


with BuildPart() as body_3_4:
    # Mirror4: read off the stored shape, not the designer's step
    # Mirror4: mirrored copy
    add(body_3_3.part.mirror(Plane(origin=(0, -43.25, 0), x_dir=(1, 0, 0), z_dir=(0, 1, 0))))


with BuildPart() as body_3_5:
    # Mirror5: mirrored copy
    add(body_3_4.part.mirror(Plane(origin=(-34.71161526, -43.25, 960.314964031), x_dir=(0, 0, 1), z_dir=(0, -1, 0))))

    # Sketch75 → Boss-Extrude36 (add)
    with BuildSketch(Plane(origin=(0, -68.5, 0), x_dir=(-1, 0, 0), z_dir=(0, -1, 0))):
        with BuildLine():
            Line((24.266128585, -978.146354464), (23.726128585, -988.183184315))
            ThreePointArc((23.726128585, -988.183184315), (31.795966631, -983.138510724), (39.865804676, -988.183184315))
            Line((39.865804676, -988.183184315), (39.266128585, -975.05646378))
            Line((39.266128585, -975.05646378), (24.308019321, -978.056409122))
            Line((24.308019321, -978.056409122), (24.302851007, -978.146354464))
            Line((24.302851007, -978.146354464), (24.266128585, -978.146354464))
        make_face()
    extrude(amount=-BOSS_EXTRUDE36_DEPTH)

    # Sketch76 → Boss-Extrude37 (add)
    with BuildSketch(Plane.XZ.offset(68.5)):
        with BuildLine():
            ThreePointArc((-1.645542313, 922.53507943), (5.240935017, 934.704313393), (18.191933959, 929.433122668))
            Line((18.191933959, 929.433122668), (11.67040627, 948.187810964))
            Line((11.67040627, 948.187810964), (-6.699400727, 937.069026653))
            Line((-6.699400727, 937.069026653), (-1.645542313, 922.53507943))
        make_face()
    extrude(amount=-BOSS_EXTRUDE37_DEPTH)

    # Sketch77 → Cut-Extrude28 (cut)
    with BuildSketch(Plane.XZ.offset(68.5)):
        with Locations((-32.524073244, 973.386354464)):
            Rectangle(SKETCH77_W, SKETCH77_H)
    extrude(amount=-CUT_EXTRUDE28_DEPTH, mode=Mode.SUBTRACT)

    # Sketch81 → Cut-Extrude29 (cut)
    with BuildSketch(Plane.XZ.offset(68.5)):
        Polygon((4.750153018, 947.612826843), (0.960073588, 946.334039168), (-2.830005841, 945.055251493), (-1.870915085, 942.21269192), (5.709243774, 944.770267271), align=None)
        Polygon((-0.780945581, 964.005933713), (-4.571025011, 962.727146038), (-8.36110444, 961.448358362), (-7.402013684, 958.60579879), (0.178145175, 961.163374141), align=None)
    extrude(amount=-CUT_EXTRUDE29_DEPTH, mode=Mode.SUBTRACT)


solid = Compound([cut_extrude11_piece_2_1.part, body_3_5.part])
